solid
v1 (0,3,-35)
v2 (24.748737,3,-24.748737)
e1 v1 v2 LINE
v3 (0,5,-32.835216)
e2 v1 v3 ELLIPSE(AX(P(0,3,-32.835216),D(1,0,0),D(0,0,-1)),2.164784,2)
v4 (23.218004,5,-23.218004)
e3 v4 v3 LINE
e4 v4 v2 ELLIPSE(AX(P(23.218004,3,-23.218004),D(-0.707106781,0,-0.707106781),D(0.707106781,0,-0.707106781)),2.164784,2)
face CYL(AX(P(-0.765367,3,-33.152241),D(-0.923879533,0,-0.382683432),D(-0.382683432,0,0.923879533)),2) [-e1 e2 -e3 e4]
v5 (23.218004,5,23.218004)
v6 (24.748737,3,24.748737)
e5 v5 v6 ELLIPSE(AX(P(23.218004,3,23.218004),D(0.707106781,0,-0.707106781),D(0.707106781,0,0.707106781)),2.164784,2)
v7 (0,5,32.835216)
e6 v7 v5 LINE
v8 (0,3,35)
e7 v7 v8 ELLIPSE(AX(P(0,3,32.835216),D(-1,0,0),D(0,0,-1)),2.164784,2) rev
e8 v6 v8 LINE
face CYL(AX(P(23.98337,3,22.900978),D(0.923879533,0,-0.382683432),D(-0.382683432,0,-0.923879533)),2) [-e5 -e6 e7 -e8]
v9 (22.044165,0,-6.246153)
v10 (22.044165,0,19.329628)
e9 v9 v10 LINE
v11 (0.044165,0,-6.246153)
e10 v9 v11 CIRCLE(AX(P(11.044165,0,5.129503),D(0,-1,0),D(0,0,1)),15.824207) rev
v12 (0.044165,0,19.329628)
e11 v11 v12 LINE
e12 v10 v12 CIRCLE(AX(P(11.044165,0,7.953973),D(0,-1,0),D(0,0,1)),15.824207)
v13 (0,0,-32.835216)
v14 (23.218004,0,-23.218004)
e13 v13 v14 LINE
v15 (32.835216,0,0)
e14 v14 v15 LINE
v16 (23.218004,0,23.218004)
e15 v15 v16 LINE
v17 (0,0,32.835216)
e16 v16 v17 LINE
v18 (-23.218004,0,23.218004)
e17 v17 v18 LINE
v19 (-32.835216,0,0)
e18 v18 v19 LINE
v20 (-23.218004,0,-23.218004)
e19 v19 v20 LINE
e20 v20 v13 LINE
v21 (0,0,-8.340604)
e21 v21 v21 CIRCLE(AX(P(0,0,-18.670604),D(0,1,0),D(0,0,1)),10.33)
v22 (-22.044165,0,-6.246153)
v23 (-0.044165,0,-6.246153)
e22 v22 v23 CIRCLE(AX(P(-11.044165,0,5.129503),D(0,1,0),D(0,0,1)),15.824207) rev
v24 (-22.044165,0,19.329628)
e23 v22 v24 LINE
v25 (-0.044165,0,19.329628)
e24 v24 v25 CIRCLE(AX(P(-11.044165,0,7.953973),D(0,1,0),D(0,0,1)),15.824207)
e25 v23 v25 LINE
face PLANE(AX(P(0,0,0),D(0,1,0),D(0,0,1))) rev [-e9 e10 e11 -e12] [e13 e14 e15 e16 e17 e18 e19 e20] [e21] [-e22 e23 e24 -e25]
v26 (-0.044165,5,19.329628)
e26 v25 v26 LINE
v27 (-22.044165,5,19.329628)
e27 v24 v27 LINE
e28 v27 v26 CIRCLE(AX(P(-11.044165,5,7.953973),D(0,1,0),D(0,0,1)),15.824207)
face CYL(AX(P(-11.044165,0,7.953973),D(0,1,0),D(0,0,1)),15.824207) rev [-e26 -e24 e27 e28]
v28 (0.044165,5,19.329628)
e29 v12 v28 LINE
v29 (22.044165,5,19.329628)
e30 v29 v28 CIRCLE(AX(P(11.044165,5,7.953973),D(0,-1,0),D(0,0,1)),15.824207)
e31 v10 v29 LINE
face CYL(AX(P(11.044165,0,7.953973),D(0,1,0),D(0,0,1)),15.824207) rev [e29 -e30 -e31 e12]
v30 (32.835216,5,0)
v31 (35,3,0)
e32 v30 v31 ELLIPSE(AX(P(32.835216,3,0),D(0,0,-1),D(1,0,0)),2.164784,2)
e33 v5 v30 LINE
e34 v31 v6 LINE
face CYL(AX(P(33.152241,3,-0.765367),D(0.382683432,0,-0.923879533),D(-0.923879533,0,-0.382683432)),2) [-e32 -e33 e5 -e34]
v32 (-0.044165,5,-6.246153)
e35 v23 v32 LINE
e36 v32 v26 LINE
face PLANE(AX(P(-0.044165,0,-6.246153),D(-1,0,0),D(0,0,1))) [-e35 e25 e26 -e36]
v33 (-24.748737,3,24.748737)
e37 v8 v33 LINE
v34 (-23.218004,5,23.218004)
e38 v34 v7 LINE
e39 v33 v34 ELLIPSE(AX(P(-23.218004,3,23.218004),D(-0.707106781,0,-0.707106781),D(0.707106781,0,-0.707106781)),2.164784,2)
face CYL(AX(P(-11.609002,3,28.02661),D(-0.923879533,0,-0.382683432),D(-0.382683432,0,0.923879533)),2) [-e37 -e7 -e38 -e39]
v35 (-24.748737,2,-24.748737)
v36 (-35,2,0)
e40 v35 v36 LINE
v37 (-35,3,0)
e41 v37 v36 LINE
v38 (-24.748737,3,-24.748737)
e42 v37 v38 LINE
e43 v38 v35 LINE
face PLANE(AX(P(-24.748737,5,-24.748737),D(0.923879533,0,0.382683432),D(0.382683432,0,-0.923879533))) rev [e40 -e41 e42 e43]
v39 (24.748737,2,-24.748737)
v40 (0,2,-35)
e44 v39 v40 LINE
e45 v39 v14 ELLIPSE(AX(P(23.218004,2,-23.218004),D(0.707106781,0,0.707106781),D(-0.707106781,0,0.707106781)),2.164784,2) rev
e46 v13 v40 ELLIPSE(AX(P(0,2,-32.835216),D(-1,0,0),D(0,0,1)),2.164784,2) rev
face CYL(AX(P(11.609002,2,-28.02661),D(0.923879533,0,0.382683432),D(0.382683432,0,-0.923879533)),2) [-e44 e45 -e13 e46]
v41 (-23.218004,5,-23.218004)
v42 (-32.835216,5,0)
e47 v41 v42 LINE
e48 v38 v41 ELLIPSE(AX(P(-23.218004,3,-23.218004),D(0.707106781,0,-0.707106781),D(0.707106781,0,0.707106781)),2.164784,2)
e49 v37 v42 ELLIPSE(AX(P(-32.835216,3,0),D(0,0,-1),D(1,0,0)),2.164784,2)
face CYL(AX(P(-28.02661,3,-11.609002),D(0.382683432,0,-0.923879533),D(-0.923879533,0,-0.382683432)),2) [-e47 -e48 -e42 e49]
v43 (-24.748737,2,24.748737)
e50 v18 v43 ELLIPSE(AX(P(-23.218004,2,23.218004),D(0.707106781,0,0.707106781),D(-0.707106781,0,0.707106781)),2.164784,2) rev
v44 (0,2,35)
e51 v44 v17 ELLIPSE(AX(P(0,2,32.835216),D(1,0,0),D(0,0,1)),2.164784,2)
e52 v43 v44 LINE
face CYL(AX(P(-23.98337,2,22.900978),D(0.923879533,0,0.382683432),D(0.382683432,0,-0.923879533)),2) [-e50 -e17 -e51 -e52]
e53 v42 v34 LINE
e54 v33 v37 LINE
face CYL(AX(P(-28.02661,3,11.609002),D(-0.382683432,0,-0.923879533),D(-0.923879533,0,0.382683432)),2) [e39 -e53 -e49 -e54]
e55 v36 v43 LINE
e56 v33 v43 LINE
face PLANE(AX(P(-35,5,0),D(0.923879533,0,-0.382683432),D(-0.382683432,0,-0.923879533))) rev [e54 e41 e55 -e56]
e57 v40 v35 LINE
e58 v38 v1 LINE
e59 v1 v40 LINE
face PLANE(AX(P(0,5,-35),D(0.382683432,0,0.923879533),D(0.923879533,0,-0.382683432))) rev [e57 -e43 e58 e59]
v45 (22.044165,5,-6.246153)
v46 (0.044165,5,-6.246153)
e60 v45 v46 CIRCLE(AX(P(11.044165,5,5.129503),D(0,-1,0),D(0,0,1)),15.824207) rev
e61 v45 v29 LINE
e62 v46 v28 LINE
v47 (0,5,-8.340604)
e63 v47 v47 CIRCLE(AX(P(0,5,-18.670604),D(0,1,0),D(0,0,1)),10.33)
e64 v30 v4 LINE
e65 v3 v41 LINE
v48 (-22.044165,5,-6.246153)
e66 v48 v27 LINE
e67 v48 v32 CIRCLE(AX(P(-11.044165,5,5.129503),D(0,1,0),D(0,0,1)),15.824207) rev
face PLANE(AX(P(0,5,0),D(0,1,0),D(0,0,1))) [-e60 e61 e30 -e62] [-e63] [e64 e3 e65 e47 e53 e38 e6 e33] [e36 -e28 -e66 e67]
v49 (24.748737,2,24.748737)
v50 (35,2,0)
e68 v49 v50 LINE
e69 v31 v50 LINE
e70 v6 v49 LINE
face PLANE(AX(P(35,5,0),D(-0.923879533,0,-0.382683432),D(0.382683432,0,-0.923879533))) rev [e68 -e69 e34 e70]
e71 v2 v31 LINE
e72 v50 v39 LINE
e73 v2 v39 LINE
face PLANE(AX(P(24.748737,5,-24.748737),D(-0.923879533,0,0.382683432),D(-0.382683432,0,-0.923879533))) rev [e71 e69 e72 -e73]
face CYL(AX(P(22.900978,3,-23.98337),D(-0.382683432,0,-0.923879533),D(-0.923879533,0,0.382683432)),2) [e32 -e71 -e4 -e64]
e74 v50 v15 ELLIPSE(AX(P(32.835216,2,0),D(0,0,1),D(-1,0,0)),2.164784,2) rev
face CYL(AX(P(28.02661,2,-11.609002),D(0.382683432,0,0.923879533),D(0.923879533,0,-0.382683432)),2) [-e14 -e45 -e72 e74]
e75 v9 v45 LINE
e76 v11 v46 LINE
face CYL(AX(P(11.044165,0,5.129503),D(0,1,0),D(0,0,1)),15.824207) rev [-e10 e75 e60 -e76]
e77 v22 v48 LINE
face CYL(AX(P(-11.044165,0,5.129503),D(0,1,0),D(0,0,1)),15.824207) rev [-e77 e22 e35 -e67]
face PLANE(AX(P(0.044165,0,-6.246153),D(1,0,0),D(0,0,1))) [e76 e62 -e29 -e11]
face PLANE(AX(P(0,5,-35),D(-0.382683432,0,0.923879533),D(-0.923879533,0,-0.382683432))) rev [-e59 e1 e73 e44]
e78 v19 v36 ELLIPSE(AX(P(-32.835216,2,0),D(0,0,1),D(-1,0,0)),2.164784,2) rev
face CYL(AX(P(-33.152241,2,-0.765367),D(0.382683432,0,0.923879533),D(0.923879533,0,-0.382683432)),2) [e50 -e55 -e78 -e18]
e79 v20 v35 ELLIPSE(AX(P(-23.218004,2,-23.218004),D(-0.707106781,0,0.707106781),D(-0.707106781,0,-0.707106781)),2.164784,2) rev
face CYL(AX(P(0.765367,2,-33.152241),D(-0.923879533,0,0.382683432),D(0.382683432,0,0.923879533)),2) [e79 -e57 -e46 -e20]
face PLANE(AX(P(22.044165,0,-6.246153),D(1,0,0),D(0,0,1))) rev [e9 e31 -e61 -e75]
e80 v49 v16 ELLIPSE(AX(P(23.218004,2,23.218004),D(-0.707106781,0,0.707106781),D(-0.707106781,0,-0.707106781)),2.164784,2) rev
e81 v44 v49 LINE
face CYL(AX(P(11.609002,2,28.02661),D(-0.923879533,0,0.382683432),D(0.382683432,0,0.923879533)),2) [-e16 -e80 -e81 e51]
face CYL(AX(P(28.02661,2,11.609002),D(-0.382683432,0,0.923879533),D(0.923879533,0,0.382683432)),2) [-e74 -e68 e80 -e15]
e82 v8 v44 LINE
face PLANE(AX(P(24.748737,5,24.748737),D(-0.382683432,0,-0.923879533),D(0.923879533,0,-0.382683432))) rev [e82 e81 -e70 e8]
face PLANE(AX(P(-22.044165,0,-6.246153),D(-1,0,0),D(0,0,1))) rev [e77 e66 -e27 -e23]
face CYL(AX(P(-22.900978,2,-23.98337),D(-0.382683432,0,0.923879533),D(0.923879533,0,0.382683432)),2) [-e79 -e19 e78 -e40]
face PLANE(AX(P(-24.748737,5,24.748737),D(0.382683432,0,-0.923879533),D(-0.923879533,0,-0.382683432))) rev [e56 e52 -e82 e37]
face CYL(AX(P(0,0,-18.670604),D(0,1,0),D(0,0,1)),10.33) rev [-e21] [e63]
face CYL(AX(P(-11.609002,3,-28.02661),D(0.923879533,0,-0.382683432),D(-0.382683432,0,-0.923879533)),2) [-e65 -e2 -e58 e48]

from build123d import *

# Parameters (mm, degrees)
BOSS_EXTRUDE1_DEPTH = 5
SKETCH4_W           = 22
SKETCH4_H           = 25.575781223
CUT_EXTRUDE1_DEPTH  = 5
CUT_EXTRUDE2_DEPTH  = 5
SKETCH10_W          = 47.253020793
SKETCH10_H          = 79.148030785
CUT_EXTRUDE3_DEPTH  = 5
MIRROR8_DEPTH       = 5
SKETCH11_R          = 10.33
CUT_EXTRUDE4_DEPTH  = 5
FILLET5_R           = 2


# Read off the part's stored shape, not the designer's step: Mirror8
with BuildPart() as part:
    # Sketch3 → Boss-Extrude1 (new body)
    with BuildSketch(Plane(origin=(0, 0, 0), x_dir=(1, 0, 0), z_dir=(0, 1, 0))):
        Polygon((35, 0), (24.748737342, 24.748737342), (0, 35), (-24.748737342, 24.748737342), (-35, 0), (-24.748737342, -24.748737342), (0, -35), (24.748737342, -24.748737342), align=None)
    extrude(amount=BOSS_EXTRUDE1_DEPTH)

    # Sketch4 → Cut-Extrude1 (cut)
    with BuildSketch(Plane(origin=(0, 5, 0), x_dir=(1, 0, 0), z_dir=(0, 1, 0))):
        with Locations((-11.044164743, -6.541737694)):
            Rectangle(SKETCH4_W, SKETCH4_H)
    extrude(amount=-CUT_EXTRUDE1_DEPTH, mode=Mode.SUBTRACT)

    # Sketch4<6> → Cut-Extrude2 (cut)
    with BuildSketch(Plane(origin=(0, 5, 0), x_dir=(1, 0, 0), z_dir=(0, 1, 0))):
        with BuildLine():
            ThreePointArc((-22.044164743, 6.246152918), (-11.044164743, 10.694704781), (-0.044164743, 6.246152918))
            Line((-0.044164743, 6.246152918), (-22.044164743, 6.246152918))
        make_face()
        with BuildLine():
            Line((-22.044164743, -19.329628305), (-0.044164743, -19.329628305))
            ThreePointArc((-0.044164743, -19.329628305), (-11.044164743, -23.778180168), (-22.044164743, -19.329628305))
        make_face()
    extrude(amount=-CUT_EXTRUDE2_DEPTH, mode=Mode.SUBTRACT)

    # Sketch10 → Cut-Extrude3 (cut)
    with BuildSketch(Plane(origin=(0, 5, 0), x_dir=(1, 0, 0), z_dir=(0, 1, 0))):
        with Locations((23.626510397, -1.493894903)):
            Rectangle(SKETCH10_W, SKETCH10_H)
    extrude(amount=-CUT_EXTRUDE3_DEPTH, mode=Mode.SUBTRACT)

    # Mirror8 outline → Mirror8 (add)
    with BuildSketch(Plane(origin=(0, 0, 0), x_dir=(1, 0, 0), z_dir=(0, 1, 0))):
        Polygon((24.748737342, 24.748737342), (0, 35), (0, -35), (24.748737342, -24.748737342), (35, 0), align=None)
        with BuildLine():
            ThreePointArc((0.044164743, 6.246152918), (11.044164743, 10.694704781), (22.044164743, 6.246152918))
            Line((22.044164743, 6.246152918), (22.044164743, -19.329628305))
            ThreePointArc((22.044164743, -19.329628305), (11.044164743, -23.778180168), (0.044164743, -19.329628305))
            Line((0.044164743, -19.329628305), (0.044164743, 6.246152918))
        make_face(mode=Mode.SUBTRACT)
    extrude(amount=MIRROR8_DEPTH)

    # Sketch11 → Cut-Extrude4 (cut)
    with BuildSketch(Plane(origin=(0, 5, 0), x_dir=(1, 0, 0), z_dir=(0, 1, 0))):
        with Locations(Location((0, 18.670604022, 0), (0, 0, 270))):
            Circle(SKETCH11_R)
    extrude(amount=-CUT_EXTRUDE4_DEPTH, mode=Mode.SUBTRACT)

    # Fillet5
    fillet5_edges = [part.edges().sort_by_distance(p)[0] for p in [
        (-12.374368671, 5, -29.874368671),
        (-29.874368671, 5, -12.374368671),
        (-29.874368671, 5, 12.374368671),
        (-12.374368671, 5, 29.874368671),
        (12.374368671, 5, -29.874368671),
        (29.874368671, 5, -12.374368671),
        (29.874368671, 5, 12.374368671),
        (12.374368671, 0, -29.874368671),
        (29.874368671, 0, -12.374368671),
        (29.874368671, 0, 12.374368671),
        (12.374368671, 0, 29.874368671),
        (12.374368671, 5, 29.874368671),
        (-12.374368671, 0, 29.874368671),
        (-29.874368671, 0, 12.374368671),
        (-29.874368671, 0, -12.374368671),
        (-12.374368671, 0, -29.874368671),
    ]]
    fillet(fillet5_edges, radius=FILLET5_R)


solid = part.part
